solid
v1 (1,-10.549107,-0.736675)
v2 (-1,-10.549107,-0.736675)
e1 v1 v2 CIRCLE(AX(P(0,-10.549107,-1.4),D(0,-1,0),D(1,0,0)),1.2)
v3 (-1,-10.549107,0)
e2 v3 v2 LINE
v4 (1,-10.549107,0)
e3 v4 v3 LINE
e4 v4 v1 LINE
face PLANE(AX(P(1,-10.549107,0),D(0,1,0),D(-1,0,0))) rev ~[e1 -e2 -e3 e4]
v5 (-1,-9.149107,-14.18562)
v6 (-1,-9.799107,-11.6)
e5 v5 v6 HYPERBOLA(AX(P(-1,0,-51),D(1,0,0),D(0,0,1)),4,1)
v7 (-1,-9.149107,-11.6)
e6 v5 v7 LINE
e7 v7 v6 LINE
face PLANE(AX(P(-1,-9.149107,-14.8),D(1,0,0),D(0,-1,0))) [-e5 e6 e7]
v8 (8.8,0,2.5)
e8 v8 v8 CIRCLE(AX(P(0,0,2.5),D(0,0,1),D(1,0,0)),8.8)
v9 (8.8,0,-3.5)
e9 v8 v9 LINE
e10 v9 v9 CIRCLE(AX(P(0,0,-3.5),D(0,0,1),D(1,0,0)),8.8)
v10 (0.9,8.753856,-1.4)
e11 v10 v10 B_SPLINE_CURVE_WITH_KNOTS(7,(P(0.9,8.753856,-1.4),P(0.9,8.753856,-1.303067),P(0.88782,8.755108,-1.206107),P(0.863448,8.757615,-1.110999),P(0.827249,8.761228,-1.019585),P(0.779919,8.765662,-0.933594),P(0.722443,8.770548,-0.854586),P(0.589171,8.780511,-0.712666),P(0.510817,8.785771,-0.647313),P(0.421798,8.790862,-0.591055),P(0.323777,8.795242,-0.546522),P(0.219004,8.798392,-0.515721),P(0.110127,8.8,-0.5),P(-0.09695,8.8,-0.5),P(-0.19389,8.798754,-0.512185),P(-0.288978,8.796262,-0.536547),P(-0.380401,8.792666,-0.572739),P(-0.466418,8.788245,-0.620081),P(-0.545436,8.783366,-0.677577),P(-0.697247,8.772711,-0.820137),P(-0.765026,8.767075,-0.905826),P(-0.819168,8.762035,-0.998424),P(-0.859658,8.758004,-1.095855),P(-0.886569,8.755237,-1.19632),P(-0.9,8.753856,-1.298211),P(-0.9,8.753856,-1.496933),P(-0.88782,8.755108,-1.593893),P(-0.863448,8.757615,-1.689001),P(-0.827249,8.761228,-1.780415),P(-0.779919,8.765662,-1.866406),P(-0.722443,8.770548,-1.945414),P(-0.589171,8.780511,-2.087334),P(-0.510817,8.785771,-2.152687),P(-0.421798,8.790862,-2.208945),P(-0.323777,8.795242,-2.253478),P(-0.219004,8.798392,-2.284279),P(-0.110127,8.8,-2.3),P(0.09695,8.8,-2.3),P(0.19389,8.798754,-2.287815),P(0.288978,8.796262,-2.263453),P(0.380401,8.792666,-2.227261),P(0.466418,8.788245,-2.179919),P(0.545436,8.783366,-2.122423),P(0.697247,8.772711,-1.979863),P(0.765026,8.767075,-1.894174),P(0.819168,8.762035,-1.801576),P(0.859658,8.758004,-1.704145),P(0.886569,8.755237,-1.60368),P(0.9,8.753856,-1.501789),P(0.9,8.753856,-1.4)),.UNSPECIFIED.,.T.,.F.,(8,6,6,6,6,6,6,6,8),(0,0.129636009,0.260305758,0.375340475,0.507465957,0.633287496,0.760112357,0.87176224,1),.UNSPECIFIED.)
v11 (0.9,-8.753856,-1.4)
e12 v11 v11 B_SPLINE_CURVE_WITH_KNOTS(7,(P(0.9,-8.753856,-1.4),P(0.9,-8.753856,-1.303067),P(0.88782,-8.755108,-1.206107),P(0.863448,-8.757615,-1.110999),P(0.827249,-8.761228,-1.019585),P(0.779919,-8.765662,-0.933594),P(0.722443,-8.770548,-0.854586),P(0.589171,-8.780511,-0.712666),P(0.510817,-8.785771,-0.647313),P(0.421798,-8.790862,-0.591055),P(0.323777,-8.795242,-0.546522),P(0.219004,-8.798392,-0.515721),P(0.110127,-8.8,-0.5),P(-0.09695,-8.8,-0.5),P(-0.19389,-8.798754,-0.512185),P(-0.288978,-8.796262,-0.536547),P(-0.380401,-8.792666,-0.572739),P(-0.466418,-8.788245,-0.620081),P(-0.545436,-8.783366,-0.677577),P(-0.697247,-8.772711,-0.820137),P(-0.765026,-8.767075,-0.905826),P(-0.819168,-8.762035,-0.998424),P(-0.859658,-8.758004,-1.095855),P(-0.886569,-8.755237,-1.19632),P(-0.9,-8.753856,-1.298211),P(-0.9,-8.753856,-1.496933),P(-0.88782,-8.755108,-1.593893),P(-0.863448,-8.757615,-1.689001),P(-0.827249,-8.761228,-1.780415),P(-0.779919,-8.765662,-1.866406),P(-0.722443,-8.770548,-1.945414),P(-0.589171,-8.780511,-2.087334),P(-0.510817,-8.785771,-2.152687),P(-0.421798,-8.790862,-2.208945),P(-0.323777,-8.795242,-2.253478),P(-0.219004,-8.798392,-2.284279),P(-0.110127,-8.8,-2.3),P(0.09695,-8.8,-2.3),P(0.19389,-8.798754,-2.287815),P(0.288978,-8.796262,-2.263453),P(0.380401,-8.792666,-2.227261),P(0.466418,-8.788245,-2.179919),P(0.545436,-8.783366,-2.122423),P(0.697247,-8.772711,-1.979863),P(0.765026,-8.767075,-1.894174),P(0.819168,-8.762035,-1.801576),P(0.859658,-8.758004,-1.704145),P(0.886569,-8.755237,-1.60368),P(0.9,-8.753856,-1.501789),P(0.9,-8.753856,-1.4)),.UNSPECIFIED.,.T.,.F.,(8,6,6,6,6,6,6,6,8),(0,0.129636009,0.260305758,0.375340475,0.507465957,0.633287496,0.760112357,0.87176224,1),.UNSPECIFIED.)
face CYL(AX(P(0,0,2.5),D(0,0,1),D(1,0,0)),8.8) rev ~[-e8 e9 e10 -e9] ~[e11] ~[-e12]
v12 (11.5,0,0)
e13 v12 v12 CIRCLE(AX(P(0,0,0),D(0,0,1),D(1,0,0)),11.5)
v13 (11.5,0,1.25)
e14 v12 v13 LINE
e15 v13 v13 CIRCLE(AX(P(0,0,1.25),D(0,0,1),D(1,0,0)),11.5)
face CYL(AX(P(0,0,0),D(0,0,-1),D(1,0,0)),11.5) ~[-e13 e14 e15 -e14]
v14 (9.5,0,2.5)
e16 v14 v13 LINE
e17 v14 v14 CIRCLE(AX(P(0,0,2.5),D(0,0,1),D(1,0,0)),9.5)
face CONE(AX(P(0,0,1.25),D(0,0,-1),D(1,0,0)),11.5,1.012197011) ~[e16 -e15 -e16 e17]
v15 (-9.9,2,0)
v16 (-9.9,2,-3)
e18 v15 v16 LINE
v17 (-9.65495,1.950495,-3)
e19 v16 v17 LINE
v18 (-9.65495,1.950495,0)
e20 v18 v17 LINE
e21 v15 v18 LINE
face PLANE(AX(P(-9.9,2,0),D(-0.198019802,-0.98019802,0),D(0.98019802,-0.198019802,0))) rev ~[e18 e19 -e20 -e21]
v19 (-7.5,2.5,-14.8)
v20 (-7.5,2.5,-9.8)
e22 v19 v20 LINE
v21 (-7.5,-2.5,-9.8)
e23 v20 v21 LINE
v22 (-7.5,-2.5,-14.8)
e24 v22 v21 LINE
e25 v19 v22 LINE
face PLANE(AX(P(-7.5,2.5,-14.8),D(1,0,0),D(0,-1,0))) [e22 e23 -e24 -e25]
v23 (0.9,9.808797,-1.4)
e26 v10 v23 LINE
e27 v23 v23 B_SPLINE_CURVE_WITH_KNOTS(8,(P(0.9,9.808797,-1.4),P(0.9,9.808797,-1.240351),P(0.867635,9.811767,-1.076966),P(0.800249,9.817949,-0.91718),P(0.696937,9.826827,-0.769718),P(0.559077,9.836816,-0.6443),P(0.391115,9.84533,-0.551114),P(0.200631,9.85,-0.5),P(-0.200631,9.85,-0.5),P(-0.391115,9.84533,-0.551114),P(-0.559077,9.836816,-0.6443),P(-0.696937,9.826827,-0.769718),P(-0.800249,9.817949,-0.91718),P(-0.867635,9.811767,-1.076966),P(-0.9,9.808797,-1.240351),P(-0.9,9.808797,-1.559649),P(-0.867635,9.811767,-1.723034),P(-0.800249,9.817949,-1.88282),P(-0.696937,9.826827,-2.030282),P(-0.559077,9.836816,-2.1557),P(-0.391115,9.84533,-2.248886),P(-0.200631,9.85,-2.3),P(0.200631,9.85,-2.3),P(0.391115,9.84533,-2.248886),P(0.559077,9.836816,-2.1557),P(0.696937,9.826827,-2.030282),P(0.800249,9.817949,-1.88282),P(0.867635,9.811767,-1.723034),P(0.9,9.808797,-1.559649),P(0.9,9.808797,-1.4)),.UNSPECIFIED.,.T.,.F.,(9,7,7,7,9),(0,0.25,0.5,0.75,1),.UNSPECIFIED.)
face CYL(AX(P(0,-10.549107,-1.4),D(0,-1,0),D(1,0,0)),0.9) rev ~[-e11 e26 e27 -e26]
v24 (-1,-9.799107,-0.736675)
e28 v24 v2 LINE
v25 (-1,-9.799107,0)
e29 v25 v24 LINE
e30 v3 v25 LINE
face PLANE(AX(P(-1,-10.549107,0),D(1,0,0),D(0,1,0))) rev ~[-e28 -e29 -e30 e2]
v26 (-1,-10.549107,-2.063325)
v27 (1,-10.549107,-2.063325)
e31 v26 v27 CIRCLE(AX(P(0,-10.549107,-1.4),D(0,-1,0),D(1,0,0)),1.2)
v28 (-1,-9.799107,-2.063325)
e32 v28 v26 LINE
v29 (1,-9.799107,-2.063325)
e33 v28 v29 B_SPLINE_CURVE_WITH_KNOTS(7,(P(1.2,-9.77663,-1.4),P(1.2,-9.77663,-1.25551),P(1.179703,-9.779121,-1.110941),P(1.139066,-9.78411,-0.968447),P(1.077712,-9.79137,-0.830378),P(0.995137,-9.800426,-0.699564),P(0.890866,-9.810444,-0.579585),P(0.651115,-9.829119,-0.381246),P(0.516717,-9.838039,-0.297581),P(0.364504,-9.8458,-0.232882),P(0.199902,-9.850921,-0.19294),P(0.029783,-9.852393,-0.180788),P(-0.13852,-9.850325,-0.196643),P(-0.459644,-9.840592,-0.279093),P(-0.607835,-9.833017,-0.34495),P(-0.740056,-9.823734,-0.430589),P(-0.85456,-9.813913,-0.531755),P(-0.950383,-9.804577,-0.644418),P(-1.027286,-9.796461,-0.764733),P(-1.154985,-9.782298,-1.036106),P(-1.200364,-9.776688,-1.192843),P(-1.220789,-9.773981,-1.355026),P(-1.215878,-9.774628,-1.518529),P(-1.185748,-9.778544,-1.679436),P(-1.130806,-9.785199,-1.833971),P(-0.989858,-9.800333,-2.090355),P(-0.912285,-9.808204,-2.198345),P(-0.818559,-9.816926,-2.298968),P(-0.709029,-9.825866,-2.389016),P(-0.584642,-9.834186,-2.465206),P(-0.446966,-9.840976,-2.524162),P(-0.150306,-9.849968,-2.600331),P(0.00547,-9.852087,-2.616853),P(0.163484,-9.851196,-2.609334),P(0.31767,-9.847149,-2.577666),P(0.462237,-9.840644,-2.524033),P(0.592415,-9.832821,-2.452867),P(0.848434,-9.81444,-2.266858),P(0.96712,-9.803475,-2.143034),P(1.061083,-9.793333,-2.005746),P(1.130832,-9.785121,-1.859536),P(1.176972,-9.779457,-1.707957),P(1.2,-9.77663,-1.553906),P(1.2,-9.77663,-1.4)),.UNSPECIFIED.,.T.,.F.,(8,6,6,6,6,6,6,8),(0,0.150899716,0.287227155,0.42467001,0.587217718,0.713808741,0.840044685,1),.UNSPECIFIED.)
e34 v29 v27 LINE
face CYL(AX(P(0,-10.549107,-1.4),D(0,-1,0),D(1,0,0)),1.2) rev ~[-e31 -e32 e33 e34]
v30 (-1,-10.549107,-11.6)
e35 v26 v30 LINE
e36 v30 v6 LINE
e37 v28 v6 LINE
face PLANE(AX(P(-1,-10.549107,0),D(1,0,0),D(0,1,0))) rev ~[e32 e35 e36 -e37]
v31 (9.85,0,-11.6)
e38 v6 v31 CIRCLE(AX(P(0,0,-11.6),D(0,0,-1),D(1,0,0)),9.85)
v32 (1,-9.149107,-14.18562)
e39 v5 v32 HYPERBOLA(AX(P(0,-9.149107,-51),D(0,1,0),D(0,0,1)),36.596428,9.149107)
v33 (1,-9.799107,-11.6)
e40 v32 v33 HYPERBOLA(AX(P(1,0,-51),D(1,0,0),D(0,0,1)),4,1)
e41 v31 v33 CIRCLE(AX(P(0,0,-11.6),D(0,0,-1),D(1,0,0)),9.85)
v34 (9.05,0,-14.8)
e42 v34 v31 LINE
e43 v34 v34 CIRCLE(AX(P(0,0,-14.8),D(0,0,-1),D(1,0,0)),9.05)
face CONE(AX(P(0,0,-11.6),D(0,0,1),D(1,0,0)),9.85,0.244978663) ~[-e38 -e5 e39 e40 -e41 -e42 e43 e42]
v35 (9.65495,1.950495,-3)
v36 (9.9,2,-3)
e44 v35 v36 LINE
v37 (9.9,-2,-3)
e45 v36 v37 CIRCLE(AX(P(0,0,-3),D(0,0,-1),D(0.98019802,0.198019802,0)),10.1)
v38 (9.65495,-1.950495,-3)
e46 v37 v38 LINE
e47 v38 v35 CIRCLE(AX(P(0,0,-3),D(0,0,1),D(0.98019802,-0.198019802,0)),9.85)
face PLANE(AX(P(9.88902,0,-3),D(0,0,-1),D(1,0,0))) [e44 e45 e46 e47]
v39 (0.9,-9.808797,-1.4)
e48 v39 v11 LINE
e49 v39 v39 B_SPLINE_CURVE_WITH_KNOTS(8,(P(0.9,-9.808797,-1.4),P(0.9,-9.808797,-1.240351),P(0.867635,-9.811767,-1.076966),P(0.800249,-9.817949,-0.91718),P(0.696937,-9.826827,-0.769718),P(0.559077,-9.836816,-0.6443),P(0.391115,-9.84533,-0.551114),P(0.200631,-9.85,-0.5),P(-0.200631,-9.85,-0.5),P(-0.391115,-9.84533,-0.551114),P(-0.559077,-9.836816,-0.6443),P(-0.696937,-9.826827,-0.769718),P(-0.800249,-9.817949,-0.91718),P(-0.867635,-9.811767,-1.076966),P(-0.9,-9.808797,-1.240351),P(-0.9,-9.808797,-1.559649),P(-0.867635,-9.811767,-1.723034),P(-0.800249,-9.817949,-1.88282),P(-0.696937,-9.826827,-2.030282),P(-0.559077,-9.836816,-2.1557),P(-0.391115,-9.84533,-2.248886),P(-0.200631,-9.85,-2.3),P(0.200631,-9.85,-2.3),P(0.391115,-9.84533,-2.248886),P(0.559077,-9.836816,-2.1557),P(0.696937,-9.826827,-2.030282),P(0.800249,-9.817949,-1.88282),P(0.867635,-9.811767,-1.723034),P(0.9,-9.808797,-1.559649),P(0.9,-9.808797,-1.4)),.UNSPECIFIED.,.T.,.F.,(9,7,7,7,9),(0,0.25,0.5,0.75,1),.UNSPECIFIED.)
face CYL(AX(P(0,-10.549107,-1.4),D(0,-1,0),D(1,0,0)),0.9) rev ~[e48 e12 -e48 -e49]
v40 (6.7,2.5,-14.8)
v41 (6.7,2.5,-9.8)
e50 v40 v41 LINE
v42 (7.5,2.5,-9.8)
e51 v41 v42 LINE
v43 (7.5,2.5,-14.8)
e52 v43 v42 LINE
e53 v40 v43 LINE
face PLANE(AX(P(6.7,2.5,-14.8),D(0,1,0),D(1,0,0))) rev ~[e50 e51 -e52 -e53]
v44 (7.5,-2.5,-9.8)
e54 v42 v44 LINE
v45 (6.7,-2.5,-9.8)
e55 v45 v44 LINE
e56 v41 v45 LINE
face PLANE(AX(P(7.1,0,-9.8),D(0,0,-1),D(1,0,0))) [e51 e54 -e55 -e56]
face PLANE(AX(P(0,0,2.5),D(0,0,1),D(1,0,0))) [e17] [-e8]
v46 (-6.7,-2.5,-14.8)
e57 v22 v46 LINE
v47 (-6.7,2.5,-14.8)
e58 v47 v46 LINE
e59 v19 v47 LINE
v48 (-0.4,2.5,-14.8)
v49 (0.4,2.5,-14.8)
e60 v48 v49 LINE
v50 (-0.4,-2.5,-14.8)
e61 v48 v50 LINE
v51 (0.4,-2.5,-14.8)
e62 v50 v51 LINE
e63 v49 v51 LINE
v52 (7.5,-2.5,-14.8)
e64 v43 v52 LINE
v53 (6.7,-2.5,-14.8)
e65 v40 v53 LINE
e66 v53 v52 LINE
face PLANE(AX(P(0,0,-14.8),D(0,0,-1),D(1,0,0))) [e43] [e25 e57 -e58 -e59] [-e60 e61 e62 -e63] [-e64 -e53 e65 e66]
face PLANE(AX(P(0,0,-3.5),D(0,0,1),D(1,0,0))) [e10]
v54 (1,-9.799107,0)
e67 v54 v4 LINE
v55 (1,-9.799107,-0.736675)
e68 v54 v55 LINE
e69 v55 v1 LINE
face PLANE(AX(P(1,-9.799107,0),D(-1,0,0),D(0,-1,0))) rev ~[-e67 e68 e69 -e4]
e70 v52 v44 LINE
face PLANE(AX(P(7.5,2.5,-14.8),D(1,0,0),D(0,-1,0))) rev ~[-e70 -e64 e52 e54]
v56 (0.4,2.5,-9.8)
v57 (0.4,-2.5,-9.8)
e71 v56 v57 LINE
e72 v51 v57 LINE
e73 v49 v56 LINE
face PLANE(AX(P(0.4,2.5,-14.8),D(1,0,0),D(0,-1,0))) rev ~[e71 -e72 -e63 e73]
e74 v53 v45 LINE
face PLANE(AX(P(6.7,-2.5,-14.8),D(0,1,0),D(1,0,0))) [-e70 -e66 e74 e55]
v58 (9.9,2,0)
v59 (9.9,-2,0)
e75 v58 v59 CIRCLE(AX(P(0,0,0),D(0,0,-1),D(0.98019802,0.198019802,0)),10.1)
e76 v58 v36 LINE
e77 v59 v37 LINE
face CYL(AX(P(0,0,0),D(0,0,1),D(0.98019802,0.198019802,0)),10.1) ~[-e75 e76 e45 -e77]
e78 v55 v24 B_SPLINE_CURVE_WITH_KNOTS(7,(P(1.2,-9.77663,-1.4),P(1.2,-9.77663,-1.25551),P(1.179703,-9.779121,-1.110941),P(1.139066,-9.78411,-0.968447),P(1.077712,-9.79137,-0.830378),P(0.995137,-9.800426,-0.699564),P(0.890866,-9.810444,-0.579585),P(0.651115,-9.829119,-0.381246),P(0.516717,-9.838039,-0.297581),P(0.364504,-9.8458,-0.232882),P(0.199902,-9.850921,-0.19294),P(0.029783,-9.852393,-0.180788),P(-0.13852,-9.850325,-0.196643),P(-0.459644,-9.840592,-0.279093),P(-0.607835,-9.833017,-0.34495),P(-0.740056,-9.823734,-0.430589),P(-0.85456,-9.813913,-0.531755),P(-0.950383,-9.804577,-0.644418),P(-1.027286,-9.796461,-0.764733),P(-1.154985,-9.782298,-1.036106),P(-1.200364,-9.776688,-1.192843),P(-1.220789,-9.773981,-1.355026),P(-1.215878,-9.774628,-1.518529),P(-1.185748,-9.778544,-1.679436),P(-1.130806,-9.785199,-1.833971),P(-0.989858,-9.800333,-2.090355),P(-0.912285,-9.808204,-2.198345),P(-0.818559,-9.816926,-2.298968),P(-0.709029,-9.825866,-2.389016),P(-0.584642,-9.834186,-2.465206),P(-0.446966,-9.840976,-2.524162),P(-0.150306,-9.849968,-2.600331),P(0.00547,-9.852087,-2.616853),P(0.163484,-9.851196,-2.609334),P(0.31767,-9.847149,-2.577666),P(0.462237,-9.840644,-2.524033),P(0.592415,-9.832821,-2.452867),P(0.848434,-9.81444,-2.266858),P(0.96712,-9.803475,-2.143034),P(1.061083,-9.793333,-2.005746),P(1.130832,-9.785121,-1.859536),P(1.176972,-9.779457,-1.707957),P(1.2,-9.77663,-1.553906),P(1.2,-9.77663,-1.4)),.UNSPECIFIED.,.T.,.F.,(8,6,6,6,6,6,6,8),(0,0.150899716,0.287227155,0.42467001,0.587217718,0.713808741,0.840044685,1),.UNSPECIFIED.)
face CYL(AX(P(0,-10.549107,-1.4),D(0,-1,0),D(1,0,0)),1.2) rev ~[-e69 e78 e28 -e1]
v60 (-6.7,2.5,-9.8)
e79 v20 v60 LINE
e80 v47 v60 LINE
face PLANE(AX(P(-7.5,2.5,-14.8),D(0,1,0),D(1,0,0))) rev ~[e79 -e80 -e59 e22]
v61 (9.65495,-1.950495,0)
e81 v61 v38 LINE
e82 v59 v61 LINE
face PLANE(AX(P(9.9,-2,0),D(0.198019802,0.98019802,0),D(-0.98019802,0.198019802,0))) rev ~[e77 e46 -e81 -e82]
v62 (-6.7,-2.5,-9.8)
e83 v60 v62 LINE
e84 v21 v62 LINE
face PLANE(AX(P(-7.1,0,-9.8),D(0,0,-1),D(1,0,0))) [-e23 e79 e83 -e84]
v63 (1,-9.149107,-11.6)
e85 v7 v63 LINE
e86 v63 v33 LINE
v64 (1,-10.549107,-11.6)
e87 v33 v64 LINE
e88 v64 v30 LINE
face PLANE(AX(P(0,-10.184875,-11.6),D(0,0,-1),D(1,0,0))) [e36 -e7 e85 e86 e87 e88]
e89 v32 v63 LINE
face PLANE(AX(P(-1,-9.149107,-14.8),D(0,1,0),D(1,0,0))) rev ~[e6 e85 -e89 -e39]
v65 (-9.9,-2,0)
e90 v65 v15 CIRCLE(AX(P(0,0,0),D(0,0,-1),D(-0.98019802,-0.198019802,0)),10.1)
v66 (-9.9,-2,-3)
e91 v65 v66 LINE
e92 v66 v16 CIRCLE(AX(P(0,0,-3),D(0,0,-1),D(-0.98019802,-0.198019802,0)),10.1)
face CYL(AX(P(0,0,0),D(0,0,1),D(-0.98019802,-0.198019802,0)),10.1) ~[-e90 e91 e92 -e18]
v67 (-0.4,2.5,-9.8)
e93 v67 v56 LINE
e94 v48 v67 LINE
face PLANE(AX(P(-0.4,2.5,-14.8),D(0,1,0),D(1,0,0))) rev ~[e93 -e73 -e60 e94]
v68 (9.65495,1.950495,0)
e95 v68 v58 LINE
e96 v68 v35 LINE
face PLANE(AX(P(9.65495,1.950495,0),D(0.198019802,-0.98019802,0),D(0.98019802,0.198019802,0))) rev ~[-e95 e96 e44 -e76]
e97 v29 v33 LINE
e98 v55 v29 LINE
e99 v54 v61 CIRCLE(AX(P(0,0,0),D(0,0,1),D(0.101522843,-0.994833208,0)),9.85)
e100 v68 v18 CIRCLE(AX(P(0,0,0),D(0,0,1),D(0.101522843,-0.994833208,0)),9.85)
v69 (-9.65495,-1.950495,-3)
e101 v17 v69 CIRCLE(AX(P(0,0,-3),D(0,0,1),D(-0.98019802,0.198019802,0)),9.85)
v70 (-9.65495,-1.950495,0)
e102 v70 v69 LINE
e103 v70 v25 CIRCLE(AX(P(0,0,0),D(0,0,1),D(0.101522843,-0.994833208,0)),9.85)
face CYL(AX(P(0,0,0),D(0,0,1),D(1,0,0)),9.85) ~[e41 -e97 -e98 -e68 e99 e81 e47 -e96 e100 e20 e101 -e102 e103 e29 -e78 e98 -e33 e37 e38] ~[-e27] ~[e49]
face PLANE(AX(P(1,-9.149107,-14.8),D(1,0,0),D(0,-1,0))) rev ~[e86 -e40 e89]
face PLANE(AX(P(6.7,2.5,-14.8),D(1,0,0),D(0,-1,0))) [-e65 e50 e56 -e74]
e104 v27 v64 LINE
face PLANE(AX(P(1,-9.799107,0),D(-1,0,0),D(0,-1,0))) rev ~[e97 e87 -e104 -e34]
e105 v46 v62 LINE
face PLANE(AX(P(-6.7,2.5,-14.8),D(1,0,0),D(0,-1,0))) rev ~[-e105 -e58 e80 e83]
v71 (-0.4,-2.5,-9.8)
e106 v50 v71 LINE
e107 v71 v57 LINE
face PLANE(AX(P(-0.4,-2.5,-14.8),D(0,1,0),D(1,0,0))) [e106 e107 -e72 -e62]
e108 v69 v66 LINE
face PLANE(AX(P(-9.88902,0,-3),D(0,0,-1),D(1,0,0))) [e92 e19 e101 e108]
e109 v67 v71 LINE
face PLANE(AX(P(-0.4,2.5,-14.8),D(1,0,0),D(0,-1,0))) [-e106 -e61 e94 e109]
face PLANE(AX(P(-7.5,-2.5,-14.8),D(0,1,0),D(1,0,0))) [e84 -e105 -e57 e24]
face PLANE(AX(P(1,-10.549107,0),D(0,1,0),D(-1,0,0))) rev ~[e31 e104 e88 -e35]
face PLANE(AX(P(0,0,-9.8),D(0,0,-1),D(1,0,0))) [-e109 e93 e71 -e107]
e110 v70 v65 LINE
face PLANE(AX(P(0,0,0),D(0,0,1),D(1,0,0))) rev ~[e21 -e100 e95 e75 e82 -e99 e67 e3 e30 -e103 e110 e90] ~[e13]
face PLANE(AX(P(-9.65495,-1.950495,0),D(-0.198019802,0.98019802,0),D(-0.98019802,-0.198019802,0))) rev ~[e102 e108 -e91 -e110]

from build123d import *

# Parameters (mm, degrees)
F0_R           = 11.5
F1_DEPTH       = 2.5
F2_R           = 9.85
F3_DEPTH       = 14.8
F4_SIZE2       = 3.2
F4_SIZE        = 0.8
F5_SIZE2       = 1.25
F5_SIZE        = 2
F6_R           = 8.8
F7_DEPTH       = 6
F8_W           = 0.8
F8_H           = 5
F9_DEPTH       = 5
F11_DEPTH      = 11.6
F12_W          = 2
F12_H          = 1.4
F13_DEPTH      = 3.2
F14_R          = 0.9
F15_DEPTH      = 22.0501071022
F17_END_RADIUS = 9.85
F16_R          = 1.2
F17_REACH      = 25.4442196519
F19_DEPTH      = 3


with BuildPart() as f1:
    # F0 (on Top) → F1 (new body)
    with BuildSketch(Plane.XY):
        Circle(F0_R)
    extrude(amount=F1_DEPTH)

    # F2 (on face) → F3 (join)
    with BuildSketch(Plane(origin=(0, 0, 0), x_dir=(1, 0, 0), z_dir=(0, 0, -1))):
        Circle(F2_R)
    extrude(amount=F3_DEPTH)

    # F4
    f4_edges = [f1.edges().sort_by_distance(p)[0] for p in [
        (-9.85, 0, -14.8),
    ]]
    f4_side = f1.faces().sort_by_distance((0, 0, -14.8))[0]
    chamfer(f4_edges, length=F4_SIZE, length2=F4_SIZE2, reference=f4_side)

    # F5
    f5_edges = [f1.edges().sort_by_distance(p)[0] for p in [
        (-11.5, 0, 2.5),
    ]]
    f5_side = f1.faces().sort_by_distance((0, 0, 2.5))[0]
    chamfer(f5_edges, length=F5_SIZE, length2=F5_SIZE2, reference=f5_side)

    # F6 (on face) → F7 (cut)
    with BuildSketch(Plane.XY.offset(2.5)):
        Circle(F6_R)
    extrude(amount=-F7_DEPTH, mode=Mode.SUBTRACT)

    # F8 (on face) → F9 (cut)
    with BuildSketch(Plane(origin=(0, 0, -14.8), x_dir=(1, 0, 0), z_dir=(0, 0, -1))):
        with Locations((-7.1, 0)):
            Rectangle(F8_W, F8_H)
        Rectangle(F8_W, F8_H)
        with Locations((7.1, 0)):
            Rectangle(F8_W, F8_H)
    extrude(amount=-F9_DEPTH, mode=Mode.SUBTRACT)

    # F10 (on face) → F11 (join)
    with BuildSketch(Plane(origin=(0, 0, 0), x_dir=(1, 0, 0), z_dir=(0, 0, -1))):
        with BuildLine():
            Line((-1, 10.5491071022), (-1, 9.7991071022))
            ThreePointArc((-1, 9.7991071022), (0, 9.85), (1, 9.7991071022))
            Line((1, 9.7991071022), (1, 10.5491071022))
            Line((1, 10.5491071022), (-1, 10.5491071022))
        make_face()
    extrude(amount=F11_DEPTH)

    # F12 (on face) → F13 (cut, through all)
    with BuildSketch(Plane(origin=(0, 0, -14.8), x_dir=(1, 0, 0), z_dir=(0, 0, -1))):
        with Locations((0, 9.8491071022)):
            Rectangle(F12_W, F12_H)
    extrude(amount=-F13_DEPTH, mode=Mode.SUBTRACT)

    # F14 (on face) → F15 (cut, through all)
    with BuildSketch(Plane.XZ.offset(10.5491071022)):
        with Locations((0, -1.4)):
            Circle(F14_R)
    extrude(amount=-F15_DEPTH, mode=Mode.SUBTRACT)

    f17_end = (Plane.XY.offset(-5.8) * Cylinder(F17_END_RADIUS, 124.5712732194, mode=Mode.PRIVATE)).faces().sort_by_distance((0, 9.85, -5.8))[0]
    # F16 (on face) → F17 (cut, up to the whole of a round face its end follows)
    with BuildSketch(Plane.XZ.offset(10.5491071022)):
        with Locations((0, -1.4)):
            Circle(F16_R)
    f17_long = extrude(amount=-F17_REACH, mode=Mode.PRIVATE)
    add(split(f17_long, bisect_by=f17_end, keep=Keep.ALL, mode=Mode.PRIVATE).solids().sort_by_distance((0, -10.5491071022, -1.4))[0], mode=Mode.SUBTRACT)

    # F18 (on face) → F19 (join)
    with BuildSketch(Plane(origin=(0, 0, 0), x_dir=(1, 0, 0), z_dir=(0, 0, -1))):
        with BuildLine():
            Line((-9.654950495, 1.9504950495), (-9.9, 2))
            ThreePointArc((-9.9, 2), (-10.1, 0), (-9.9, -2))
            Line((-9.9, -2), (-9.654950495, -1.9504950495))
            ThreePointArc((-9.654950495, -1.9504950495), (-9.85, 0), (-9.654950495, 1.9504950495))
        make_face()
        with BuildLine():
            Line((9.654950495, -1.9504950495), (9.9, -2))
            ThreePointArc((9.9, -2), (10.1, 0), (9.9, 2))
            Line((9.9, 2), (9.654950495, 1.9504950495))
            ThreePointArc((9.654950495, 1.9504950495), (9.85, 0), (9.654950495, -1.9504950495))
        make_face()
    extrude(amount=F19_DEPTH)


solid = f1.part
